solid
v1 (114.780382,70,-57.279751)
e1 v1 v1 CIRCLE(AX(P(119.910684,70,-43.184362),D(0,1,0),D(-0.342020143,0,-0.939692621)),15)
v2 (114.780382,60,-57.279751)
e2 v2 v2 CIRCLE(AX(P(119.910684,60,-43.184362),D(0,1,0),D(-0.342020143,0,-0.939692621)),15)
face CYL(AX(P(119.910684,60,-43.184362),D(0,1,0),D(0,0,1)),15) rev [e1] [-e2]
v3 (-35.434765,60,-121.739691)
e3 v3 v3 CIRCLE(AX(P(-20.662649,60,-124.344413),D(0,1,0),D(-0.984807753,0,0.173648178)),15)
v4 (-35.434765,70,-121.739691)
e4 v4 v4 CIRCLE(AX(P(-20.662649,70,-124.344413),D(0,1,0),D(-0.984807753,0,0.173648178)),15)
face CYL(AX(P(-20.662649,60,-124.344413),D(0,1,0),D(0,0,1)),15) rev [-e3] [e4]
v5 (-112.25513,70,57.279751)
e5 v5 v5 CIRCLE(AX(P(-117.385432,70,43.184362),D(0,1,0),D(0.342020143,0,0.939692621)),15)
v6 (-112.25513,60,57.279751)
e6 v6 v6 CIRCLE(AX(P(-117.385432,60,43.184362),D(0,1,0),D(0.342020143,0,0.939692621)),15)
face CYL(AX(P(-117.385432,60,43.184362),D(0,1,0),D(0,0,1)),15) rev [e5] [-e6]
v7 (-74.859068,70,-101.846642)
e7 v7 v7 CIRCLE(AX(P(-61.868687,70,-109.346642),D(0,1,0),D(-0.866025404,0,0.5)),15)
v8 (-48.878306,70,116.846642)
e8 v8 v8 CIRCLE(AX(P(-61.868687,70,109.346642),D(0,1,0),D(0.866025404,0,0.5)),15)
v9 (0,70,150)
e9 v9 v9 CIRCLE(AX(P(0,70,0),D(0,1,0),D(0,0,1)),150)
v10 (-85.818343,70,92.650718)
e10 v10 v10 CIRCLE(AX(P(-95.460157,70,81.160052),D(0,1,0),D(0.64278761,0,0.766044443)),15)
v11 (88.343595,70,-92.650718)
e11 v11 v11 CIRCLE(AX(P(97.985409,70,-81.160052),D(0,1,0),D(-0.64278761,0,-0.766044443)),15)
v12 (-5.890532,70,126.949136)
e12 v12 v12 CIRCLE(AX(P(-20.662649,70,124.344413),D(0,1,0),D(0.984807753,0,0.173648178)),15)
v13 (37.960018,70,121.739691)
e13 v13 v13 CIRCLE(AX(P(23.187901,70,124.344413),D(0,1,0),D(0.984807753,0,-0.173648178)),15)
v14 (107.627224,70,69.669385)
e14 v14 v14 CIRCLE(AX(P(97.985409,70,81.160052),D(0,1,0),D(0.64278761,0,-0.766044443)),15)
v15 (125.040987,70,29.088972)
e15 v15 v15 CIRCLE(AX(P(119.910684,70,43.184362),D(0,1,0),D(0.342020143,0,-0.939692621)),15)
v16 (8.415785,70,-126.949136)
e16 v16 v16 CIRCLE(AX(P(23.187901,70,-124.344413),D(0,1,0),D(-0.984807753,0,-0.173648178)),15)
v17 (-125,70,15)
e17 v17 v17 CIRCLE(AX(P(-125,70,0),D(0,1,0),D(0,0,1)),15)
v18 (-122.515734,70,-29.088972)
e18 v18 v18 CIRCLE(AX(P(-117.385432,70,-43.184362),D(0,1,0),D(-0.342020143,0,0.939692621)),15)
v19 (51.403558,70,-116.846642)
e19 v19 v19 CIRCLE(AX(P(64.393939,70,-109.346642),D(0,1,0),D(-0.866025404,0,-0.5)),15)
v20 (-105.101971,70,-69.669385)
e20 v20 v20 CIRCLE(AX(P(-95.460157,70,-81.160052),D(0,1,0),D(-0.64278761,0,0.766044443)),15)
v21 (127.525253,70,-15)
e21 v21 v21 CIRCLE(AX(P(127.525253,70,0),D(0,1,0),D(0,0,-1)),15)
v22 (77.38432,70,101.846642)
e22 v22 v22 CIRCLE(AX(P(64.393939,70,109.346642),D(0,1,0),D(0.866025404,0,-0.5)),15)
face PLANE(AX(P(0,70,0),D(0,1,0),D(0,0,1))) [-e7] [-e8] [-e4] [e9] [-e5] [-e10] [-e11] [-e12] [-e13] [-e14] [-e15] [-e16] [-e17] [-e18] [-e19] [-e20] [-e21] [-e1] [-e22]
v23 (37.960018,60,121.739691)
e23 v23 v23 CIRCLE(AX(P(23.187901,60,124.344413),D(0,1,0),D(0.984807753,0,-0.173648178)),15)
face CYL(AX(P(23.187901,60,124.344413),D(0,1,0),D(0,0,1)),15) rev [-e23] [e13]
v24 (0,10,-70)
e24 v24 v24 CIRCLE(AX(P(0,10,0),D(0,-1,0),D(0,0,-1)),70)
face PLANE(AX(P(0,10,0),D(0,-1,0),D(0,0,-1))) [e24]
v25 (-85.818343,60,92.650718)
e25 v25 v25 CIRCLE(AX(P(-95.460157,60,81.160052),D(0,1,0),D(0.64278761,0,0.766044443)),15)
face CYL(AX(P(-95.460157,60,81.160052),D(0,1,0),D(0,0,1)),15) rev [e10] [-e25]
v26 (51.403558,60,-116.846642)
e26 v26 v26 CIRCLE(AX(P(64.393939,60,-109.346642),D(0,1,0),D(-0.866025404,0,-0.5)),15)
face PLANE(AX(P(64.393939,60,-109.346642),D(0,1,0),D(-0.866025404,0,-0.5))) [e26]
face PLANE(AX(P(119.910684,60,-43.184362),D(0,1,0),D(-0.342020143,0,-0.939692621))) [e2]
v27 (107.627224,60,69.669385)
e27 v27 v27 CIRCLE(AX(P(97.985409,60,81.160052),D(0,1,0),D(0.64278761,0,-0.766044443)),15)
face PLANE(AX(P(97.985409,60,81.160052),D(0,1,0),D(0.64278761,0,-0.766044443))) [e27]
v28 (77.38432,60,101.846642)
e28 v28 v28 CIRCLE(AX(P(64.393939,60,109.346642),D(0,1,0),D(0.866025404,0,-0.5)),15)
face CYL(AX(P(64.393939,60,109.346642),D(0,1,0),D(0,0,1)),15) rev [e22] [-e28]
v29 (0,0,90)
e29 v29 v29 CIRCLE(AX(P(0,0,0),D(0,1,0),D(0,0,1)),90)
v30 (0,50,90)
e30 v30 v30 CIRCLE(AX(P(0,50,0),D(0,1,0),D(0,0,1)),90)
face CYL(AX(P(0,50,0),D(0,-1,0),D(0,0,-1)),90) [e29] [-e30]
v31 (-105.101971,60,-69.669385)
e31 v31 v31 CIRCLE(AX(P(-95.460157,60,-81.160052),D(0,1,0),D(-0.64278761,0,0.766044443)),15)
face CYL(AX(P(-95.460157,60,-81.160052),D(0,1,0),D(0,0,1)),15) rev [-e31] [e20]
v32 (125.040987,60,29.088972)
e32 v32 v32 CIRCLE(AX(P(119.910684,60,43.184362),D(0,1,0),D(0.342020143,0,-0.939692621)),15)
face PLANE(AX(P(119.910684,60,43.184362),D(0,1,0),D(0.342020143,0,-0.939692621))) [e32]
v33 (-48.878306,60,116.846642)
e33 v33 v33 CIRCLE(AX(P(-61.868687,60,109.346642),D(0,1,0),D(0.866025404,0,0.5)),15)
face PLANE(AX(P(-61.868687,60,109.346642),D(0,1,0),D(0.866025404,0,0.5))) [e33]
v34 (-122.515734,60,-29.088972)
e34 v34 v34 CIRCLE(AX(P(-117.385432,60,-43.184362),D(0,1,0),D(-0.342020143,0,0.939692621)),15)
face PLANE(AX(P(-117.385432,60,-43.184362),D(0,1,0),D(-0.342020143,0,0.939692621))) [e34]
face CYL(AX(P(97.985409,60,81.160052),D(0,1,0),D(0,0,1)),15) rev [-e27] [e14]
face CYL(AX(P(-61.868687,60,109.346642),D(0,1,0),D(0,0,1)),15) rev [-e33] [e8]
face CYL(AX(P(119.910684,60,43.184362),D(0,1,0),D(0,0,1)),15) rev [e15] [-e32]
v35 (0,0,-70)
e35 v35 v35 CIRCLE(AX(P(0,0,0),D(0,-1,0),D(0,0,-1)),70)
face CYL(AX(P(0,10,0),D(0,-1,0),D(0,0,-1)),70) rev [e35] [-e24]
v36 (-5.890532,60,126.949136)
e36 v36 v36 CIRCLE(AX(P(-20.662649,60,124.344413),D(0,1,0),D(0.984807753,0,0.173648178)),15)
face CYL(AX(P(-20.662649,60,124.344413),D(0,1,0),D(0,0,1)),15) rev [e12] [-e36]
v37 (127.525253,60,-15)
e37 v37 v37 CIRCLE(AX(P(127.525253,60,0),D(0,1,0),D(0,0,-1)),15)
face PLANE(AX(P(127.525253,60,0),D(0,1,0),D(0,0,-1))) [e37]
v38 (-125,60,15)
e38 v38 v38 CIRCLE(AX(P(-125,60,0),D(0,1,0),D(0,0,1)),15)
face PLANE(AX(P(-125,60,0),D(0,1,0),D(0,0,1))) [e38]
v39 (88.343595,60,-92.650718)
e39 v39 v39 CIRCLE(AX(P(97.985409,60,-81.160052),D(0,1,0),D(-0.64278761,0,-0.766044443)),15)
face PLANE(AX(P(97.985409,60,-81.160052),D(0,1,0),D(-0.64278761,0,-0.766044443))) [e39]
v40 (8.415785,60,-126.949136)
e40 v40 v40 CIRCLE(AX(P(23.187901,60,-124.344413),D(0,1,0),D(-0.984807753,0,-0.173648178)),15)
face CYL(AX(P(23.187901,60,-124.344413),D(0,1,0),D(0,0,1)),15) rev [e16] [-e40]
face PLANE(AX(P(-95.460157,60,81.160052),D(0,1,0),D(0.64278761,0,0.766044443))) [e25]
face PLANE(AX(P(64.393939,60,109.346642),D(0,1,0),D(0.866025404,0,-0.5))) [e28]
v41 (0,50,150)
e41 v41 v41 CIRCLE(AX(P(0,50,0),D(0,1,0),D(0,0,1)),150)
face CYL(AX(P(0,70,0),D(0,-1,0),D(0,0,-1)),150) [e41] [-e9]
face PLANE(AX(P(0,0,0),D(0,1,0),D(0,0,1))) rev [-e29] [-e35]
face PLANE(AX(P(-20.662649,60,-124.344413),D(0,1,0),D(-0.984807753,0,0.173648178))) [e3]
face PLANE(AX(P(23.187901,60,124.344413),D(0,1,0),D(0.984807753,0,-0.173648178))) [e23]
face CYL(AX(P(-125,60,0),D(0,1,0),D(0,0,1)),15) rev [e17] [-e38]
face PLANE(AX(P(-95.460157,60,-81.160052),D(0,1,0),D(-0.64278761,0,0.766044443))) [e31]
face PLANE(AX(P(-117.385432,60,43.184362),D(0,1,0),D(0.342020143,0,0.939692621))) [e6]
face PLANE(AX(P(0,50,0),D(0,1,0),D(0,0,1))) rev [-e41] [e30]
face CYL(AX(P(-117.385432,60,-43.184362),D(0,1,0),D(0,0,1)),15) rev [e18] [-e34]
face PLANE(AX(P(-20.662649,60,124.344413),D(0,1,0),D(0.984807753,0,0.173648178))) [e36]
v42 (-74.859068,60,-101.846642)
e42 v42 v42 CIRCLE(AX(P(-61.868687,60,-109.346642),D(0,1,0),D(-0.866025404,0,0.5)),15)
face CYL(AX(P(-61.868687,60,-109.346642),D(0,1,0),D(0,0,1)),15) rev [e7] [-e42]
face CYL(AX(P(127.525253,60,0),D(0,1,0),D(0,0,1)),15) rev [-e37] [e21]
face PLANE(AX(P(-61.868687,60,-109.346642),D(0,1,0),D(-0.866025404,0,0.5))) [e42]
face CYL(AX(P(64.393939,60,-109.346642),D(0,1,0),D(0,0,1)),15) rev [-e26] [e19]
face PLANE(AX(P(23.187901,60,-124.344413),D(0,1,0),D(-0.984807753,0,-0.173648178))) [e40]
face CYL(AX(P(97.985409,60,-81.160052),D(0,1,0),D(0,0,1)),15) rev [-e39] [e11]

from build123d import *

# Parameters (mm, degrees)
ESQUISSE1_R                      = 90
BOSS_EXTRU_1_DEPTH               = 50
ESQUISSE2_R                      = 70
ENL_V_MAT_EXTRU_1_DEPTH          = 10
ESQUISSE3_R                      = 150
BOSS_EXTRU_2_DEPTH               = 20
ESQUISSE4_R                      = 15
ENL_V_MAT_EXTRU_2_DEPTH          = 10
R_P_TITION_START                 = 60
R_P_TITION_CIRCULAIRE1_OUTLINE_R = 15
R_P_TITION_CIRCULAIRE1_DEPTH     = 10


# Read off the part's stored shape, not the designer's step: Répétition circulaire1
with BuildPart() as part:
    # Esquisse1 → Boss.-Extru.1 (new body)
    with BuildSketch(Plane(origin=(0, 0, 0), x_dir=(1, 0, 0), z_dir=(0, 1, 0))):
        with Locations(Location((0, 0, 0), (0, 0, 270))):
            Circle(ESQUISSE1_R)
    extrude(amount=BOSS_EXTRU_1_DEPTH)

    # Esquisse2 → Enlèv. mat.-Extru.1 (cut)
    with BuildSketch(Plane(origin=(0, 0, 0), x_dir=(-1, 0, 0), z_dir=(0, -1, 0))):
        with Locations(Location((0, 0, 0), (0, 0, 90))):
            Circle(ESQUISSE2_R)
    extrude(amount=-ENL_V_MAT_EXTRU_1_DEPTH, mode=Mode.SUBTRACT)

    # Esquisse3 → Boss.-Extru.2 (add)
    with BuildSketch(Plane(origin=(0, 50, 0), x_dir=(1, 0, 0), z_dir=(0, 1, 0))):
        with Locations(Location((0, 0, 0), (0, 0, 270))):
            Circle(ESQUISSE3_R)
    extrude(amount=BOSS_EXTRU_2_DEPTH)

    # Esquisse4 → Enlèv. mat.-Extru.2 (cut)
    with BuildSketch(Plane(origin=(0, 70, 0), x_dir=(1, 0, 0), z_dir=(0, 1, 0))):
        with Locations(Location((-125, 0, 0), (0, 0, 270))):
            Circle(ESQUISSE4_R)
    extrude(amount=-ENL_V_MAT_EXTRU_2_DEPTH, mode=Mode.SUBTRACT)

    # Répétition circulaire1 outline → Répétition circulaire1 (cut)
    with BuildSketch(Plane(origin=(0, 0, 0), x_dir=(1, 0, 0), z_dir=(0, 1, 0)).offset(R_P_TITION_START)):
        with Locations((-117.385431917, -43.184361531)):
            Circle(R_P_TITION_CIRCULAIRE1_OUTLINE_R)
        with Locations((-117.385431917, 43.184361531)):
            Circle(R_P_TITION_CIRCULAIRE1_OUTLINE_R)
        with Locations((-95.460156959, 81.160051728)):
            Circle(R_P_TITION_CIRCULAIRE1_OUTLINE_R)
        with Locations((-61.868686869, 109.346641892)):
            Circle(R_P_TITION_CIRCULAIRE1_OUTLINE_R)
        with Locations((-20.662648695, 124.344413259)):
            Circle(R_P_TITION_CIRCULAIRE1_OUTLINE_R)
        with Locations((23.187901221, 124.344413259)):
            Circle(R_P_TITION_CIRCULAIRE1_OUTLINE_R)
        with Locations((64.393939394, 109.346641892)):
            Circle(R_P_TITION_CIRCULAIRE1_OUTLINE_R)
        with Locations((97.985409485, 81.160051728)):
            Circle(R_P_TITION_CIRCULAIRE1_OUTLINE_R)
        with Locations((119.910684443, 43.184361531)):
            Circle(R_P_TITION_CIRCULAIRE1_OUTLINE_R)
        with Locations((127.525252525, 0)):
            Circle(R_P_TITION_CIRCULAIRE1_OUTLINE_R)
        with Locations((119.910684443, -43.184361531)):
            Circle(R_P_TITION_CIRCULAIRE1_OUTLINE_R)
        with Locations((97.985409485, -81.160051728)):
            Circle(R_P_TITION_CIRCULAIRE1_OUTLINE_R)
        with Locations((64.393939394, -109.346641892)):
            Circle(R_P_TITION_CIRCULAIRE1_OUTLINE_R)
        with Locations((23.187901221, -124.344413259)):
            Circle(R_P_TITION_CIRCULAIRE1_OUTLINE_R)
        with Locations((-20.662648695, -124.344413259)):
            Circle(R_P_TITION_CIRCULAIRE1_OUTLINE_R)
        with Locations((-61.868686869, -109.346641892)):
            Circle(R_P_TITION_CIRCULAIRE1_OUTLINE_R)
        with Locations((-95.460156959, -81.160051728)):
            Circle(R_P_TITION_CIRCULAIRE1_OUTLINE_R)
    extrude(amount=R_P_TITION_CIRCULAIRE1_DEPTH, mode=Mode.SUBTRACT)


solid = part.part
